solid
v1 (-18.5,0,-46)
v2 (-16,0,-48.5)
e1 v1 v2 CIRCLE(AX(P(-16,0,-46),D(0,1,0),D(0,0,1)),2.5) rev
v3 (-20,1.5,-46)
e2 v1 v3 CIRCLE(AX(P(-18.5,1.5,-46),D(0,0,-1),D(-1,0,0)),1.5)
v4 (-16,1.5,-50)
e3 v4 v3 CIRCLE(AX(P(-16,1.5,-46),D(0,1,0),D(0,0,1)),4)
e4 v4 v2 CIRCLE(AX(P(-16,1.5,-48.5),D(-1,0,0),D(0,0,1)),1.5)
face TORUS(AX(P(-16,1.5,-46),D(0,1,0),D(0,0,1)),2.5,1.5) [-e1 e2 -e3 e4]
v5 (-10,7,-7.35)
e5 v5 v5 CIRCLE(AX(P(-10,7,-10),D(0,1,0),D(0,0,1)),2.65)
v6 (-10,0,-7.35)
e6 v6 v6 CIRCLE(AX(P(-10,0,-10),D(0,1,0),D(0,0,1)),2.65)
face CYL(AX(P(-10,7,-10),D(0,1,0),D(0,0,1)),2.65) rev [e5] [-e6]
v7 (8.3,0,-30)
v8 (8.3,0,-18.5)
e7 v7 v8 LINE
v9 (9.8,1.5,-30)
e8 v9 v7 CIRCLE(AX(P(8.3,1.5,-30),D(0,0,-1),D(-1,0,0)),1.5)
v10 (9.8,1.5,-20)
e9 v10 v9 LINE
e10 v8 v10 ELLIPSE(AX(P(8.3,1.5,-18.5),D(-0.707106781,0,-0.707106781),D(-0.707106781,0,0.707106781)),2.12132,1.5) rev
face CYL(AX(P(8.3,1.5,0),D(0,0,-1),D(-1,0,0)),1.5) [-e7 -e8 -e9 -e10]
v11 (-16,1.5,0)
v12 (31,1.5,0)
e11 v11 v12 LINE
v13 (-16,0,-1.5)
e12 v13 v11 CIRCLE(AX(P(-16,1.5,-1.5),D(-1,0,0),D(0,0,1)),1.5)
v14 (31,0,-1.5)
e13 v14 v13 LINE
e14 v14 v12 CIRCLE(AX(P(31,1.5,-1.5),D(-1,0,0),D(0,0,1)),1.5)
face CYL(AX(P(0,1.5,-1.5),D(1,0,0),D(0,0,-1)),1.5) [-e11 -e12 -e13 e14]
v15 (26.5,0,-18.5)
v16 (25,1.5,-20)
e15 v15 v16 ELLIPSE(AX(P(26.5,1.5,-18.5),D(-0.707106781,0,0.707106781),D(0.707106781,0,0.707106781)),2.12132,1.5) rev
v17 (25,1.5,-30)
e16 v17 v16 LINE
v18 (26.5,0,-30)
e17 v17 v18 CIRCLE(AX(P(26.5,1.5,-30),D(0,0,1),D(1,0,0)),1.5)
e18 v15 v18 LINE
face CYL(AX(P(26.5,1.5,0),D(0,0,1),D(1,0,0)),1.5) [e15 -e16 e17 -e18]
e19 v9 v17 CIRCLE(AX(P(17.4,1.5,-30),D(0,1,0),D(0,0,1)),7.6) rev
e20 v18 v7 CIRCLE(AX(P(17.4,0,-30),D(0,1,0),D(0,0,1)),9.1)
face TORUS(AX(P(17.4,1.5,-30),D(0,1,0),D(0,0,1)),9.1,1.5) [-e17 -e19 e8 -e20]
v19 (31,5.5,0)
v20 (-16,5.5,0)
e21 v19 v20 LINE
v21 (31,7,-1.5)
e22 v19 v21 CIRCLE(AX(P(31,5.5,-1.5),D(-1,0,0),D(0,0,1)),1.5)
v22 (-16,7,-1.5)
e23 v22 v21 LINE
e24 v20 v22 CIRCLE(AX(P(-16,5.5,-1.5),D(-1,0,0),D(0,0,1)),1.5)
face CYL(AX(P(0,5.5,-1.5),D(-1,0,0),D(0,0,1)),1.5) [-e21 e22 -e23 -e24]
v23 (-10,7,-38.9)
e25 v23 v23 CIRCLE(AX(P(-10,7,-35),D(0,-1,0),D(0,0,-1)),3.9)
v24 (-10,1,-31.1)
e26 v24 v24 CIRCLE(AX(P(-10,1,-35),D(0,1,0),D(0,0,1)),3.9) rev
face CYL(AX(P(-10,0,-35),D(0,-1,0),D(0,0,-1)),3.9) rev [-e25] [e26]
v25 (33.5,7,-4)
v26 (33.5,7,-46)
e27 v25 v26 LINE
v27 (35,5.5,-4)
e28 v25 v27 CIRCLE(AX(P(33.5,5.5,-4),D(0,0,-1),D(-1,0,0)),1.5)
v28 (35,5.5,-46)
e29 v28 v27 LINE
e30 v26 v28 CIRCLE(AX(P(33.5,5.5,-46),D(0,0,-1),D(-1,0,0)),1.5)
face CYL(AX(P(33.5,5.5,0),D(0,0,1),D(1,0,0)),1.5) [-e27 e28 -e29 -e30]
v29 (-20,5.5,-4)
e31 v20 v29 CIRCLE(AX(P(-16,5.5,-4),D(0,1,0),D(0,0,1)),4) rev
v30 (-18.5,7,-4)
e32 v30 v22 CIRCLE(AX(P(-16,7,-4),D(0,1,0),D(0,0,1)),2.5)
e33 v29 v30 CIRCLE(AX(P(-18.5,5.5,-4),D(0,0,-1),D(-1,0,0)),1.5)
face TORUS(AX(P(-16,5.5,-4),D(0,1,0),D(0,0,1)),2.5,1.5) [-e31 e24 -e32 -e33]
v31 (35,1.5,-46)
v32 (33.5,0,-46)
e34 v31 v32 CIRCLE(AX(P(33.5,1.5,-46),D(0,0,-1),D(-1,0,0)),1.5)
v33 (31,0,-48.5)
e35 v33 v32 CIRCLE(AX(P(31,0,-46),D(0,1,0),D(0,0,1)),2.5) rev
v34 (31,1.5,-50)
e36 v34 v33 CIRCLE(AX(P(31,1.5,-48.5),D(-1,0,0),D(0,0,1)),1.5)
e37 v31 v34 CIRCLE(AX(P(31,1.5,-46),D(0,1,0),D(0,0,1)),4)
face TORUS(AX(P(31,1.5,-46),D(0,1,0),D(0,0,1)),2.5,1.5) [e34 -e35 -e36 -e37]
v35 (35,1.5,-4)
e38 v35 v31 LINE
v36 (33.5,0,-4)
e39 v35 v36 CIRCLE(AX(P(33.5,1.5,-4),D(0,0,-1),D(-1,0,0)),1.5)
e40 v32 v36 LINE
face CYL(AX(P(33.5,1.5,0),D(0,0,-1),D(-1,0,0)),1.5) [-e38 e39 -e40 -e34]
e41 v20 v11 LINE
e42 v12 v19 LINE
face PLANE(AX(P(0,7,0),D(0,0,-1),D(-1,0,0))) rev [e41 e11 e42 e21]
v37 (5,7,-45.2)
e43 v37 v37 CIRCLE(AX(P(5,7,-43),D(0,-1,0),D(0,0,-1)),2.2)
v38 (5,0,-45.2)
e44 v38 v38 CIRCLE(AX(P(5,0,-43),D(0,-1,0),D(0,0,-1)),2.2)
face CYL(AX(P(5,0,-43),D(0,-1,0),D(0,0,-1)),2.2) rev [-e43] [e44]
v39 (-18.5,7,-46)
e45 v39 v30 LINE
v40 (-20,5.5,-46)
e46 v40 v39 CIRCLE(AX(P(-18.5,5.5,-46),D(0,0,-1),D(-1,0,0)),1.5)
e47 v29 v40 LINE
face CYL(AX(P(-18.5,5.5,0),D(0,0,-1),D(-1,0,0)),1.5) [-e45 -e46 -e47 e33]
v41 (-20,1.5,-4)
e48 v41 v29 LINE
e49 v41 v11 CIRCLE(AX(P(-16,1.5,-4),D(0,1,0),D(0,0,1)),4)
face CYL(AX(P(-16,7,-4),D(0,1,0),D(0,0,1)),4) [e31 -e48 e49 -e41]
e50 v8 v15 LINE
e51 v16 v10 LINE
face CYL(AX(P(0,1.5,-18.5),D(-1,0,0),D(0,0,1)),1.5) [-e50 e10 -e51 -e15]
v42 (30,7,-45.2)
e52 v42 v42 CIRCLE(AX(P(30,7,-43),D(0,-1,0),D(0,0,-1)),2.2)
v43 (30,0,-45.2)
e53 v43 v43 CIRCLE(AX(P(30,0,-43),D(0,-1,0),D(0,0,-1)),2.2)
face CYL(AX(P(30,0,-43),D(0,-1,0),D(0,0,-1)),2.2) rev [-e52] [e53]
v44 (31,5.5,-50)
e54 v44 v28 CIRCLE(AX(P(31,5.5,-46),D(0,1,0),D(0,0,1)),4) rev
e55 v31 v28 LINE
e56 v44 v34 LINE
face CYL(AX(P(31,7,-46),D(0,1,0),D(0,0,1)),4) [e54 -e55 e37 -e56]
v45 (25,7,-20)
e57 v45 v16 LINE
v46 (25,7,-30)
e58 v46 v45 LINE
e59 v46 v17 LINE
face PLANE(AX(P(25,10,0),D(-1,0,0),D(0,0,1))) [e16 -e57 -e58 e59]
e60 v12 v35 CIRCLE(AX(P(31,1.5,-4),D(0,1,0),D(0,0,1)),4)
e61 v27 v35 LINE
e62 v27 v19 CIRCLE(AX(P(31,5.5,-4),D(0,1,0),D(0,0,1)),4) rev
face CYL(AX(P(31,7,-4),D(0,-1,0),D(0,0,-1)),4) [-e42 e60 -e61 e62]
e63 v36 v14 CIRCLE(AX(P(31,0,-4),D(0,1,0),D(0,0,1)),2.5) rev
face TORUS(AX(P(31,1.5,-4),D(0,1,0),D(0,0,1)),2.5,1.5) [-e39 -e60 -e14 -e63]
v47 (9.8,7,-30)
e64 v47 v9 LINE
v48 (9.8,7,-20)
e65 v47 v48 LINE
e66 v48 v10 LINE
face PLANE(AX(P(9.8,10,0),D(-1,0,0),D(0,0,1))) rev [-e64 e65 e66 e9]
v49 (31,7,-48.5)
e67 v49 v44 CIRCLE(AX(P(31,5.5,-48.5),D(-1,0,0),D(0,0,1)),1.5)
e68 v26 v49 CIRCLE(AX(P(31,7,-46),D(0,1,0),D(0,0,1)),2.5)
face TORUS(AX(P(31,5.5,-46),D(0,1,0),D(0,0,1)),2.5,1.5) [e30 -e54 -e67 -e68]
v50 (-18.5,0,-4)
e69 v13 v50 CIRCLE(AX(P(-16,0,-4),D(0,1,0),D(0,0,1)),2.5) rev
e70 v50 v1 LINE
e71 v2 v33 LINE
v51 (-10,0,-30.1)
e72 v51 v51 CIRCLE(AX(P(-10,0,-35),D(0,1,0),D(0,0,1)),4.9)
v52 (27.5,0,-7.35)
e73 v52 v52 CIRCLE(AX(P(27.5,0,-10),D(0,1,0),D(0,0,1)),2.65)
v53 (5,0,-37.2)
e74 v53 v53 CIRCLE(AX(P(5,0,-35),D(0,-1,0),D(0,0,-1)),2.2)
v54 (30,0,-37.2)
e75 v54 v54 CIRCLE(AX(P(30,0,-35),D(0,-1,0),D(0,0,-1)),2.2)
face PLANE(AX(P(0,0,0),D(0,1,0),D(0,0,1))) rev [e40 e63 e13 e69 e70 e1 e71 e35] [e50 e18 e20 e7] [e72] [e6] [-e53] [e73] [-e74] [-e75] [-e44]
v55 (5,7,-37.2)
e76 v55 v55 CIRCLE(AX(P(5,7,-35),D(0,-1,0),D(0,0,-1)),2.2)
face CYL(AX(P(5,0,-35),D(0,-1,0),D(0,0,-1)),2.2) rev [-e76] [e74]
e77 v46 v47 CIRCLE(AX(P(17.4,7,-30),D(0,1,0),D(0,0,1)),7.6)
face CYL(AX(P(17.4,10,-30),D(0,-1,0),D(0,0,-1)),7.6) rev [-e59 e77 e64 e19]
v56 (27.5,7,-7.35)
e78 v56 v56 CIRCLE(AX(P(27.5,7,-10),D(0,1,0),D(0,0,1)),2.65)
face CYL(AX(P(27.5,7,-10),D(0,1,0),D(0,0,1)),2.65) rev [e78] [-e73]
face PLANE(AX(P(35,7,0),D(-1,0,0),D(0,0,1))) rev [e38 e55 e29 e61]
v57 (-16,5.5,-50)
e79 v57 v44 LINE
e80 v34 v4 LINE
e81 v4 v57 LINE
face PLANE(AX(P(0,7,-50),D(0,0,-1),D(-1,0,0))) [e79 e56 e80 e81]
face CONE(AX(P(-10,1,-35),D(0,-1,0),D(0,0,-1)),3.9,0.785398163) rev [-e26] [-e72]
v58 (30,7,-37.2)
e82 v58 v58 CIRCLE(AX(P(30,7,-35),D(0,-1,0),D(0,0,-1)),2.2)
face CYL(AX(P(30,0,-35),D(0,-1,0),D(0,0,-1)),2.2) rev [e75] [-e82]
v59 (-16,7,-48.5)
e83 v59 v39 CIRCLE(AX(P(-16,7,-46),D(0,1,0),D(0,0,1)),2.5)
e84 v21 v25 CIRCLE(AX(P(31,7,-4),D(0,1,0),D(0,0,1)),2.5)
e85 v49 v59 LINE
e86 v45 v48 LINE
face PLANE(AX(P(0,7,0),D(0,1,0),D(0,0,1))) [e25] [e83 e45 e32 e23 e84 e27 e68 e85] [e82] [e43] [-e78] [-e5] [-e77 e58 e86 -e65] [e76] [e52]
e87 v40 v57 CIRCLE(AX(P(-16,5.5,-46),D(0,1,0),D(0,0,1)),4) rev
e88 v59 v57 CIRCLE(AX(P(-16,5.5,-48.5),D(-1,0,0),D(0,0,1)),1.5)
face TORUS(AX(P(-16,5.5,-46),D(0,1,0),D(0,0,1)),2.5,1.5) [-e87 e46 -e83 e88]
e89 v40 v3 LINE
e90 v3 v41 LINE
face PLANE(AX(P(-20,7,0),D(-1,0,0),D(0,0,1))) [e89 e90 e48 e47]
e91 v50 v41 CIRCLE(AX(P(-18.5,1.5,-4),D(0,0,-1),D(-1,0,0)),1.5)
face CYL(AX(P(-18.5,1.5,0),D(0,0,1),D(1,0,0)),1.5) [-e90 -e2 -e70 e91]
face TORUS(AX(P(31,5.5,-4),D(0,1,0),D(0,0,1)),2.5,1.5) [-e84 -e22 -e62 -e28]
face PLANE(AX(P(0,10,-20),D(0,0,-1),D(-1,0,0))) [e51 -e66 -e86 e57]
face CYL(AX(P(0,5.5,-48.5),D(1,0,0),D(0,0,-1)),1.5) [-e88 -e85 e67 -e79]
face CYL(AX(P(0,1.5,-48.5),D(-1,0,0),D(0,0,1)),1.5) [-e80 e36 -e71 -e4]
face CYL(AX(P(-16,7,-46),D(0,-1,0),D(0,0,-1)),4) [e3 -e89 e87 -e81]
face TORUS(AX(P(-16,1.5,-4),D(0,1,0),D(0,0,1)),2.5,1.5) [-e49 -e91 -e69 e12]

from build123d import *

# Parameters (mm, degrees)
SKETCH1_W                    = 55
SKETCH1_H                    = 50
BOSS_EXTRUDE1_DEPTH          = 7
SKETCH6_W                    = 15.2
SKETCH6_H                    = 10
CUT_EXTRUDE1_DEPTH           = 10
M5_CLEARANCE_HOLE1_OUTLINE_R = 2.65
M5_CLEARANCE_HOLE1_DEPTH     = 7
F_4_4_4_4_DIAMETER_HOLE2_D   = 4.4
F_7_8_7_8_DIAMETER_HOLE1_D   = 7.8
FILLET1_R                    = 4
FILLET2_R                    = 1.5
CHAMFER1_SIZE                = 1


# Read off the part's stored shape, not the designer's step: M5 Clearance Hole1
with BuildPart() as part:
    # Sketch1 → Boss-Extrude1 (new body)
    with BuildSketch(Plane(origin=(0, 0, 0), x_dir=(1, 0, 0), z_dir=(0, 1, 0))):
        with Locations((7.5, 25)):
            Rectangle(SKETCH1_W, SKETCH1_H)
    extrude(amount=BOSS_EXTRUDE1_DEPTH)

    # Sketch6 → Cut-Extrude1 (cut)
    with BuildSketch(Plane.XZ):
        with Locations((17.4, -25)):
            Rectangle(SKETCH6_W, SKETCH6_H)
        with BuildLine():
            Line((9.8, -30), (25, -30))
            ThreePointArc((25, -30), (17.4, -37.6), (9.8, -30))
        make_face()
    extrude(amount=-CUT_EXTRUDE1_DEPTH, mode=Mode.SUBTRACT)

    # M5 Clearance Hole1 outline → M5 Clearance Hole1 (cut)
    with BuildSketch(Plane(origin=(0, 0, 0), x_dir=(1, 0, 0), z_dir=(0, 1, 0))):
        with Locations((-10, 10)):
            Circle(M5_CLEARANCE_HOLE1_OUTLINE_R)
        with Locations((27.5, 10)):
            Circle(M5_CLEARANCE_HOLE1_OUTLINE_R)
    extrude(amount=M5_CLEARANCE_HOLE1_DEPTH, mode=Mode.SUBTRACT)

    # Ø4.4 (4.4) Diameter Hole2 (through all)
    with Locations(Plane.XZ):
        with Locations((30, -43), (5, -35), (30, -35), (5, -43)):
            Hole(F_4_4_4_4_DIAMETER_HOLE2_D / 2)

    # Ø7.8 (7.8) Diameter Hole1 (through all)
    with Locations(Plane.XZ):
        with Locations((-10, -35)):
            Hole(F_7_8_7_8_DIAMETER_HOLE1_D / 2)

    # Fillet1
    fillet1_edges = [part.edges().sort_by_distance(p)[0] for p in [
        (35, 3.5, -50),
        (35, 3.5, 0),
        (-20, 3.5, 0),
        (-20, 3.5, -50),
    ]]
    fillet(fillet1_edges, radius=FILLET1_R)

    # Fillet2
    fillet2_edges = [part.edges().sort_by_distance(p)[0] for p in [
        (7.5, 0, 0),
        (7.5, 7, 0),
        (-20, 0, -25),
        (7.5, 0, -50),
        (35, 0, -25),
        (33.828427125, 0, -1.171572875),
        (33.828427125, 0, -48.828427125),
        (-18.828427125, 0, -48.828427125),
        (-18.828427125, 0, -1.171572875),
        (-20, 7, -25),
        (7.5, 7, -50),
        (35, 7, -25),
        (33.828427125, 7, -1.171572875),
        (33.828427125, 7, -48.828427125),
        (-18.828427125, 7, -48.828427125),
        (-18.828427125, 7, -1.171572875),
        (25, 0, -25),
        (17.4, 0, -20),
        (9.8, 0, -25),
        (17.4, 0, -37.6),
    ]]
    fillet(fillet2_edges, radius=FILLET2_R)

    # Chamfer1
    chamfer1_edges = [part.edges().sort_by_distance(p)[0] for p in [
        (-6.1, 0, -35),
    ]]
    chamfer(chamfer1_edges, length=CHAMFER1_SIZE)


solid = part.part
